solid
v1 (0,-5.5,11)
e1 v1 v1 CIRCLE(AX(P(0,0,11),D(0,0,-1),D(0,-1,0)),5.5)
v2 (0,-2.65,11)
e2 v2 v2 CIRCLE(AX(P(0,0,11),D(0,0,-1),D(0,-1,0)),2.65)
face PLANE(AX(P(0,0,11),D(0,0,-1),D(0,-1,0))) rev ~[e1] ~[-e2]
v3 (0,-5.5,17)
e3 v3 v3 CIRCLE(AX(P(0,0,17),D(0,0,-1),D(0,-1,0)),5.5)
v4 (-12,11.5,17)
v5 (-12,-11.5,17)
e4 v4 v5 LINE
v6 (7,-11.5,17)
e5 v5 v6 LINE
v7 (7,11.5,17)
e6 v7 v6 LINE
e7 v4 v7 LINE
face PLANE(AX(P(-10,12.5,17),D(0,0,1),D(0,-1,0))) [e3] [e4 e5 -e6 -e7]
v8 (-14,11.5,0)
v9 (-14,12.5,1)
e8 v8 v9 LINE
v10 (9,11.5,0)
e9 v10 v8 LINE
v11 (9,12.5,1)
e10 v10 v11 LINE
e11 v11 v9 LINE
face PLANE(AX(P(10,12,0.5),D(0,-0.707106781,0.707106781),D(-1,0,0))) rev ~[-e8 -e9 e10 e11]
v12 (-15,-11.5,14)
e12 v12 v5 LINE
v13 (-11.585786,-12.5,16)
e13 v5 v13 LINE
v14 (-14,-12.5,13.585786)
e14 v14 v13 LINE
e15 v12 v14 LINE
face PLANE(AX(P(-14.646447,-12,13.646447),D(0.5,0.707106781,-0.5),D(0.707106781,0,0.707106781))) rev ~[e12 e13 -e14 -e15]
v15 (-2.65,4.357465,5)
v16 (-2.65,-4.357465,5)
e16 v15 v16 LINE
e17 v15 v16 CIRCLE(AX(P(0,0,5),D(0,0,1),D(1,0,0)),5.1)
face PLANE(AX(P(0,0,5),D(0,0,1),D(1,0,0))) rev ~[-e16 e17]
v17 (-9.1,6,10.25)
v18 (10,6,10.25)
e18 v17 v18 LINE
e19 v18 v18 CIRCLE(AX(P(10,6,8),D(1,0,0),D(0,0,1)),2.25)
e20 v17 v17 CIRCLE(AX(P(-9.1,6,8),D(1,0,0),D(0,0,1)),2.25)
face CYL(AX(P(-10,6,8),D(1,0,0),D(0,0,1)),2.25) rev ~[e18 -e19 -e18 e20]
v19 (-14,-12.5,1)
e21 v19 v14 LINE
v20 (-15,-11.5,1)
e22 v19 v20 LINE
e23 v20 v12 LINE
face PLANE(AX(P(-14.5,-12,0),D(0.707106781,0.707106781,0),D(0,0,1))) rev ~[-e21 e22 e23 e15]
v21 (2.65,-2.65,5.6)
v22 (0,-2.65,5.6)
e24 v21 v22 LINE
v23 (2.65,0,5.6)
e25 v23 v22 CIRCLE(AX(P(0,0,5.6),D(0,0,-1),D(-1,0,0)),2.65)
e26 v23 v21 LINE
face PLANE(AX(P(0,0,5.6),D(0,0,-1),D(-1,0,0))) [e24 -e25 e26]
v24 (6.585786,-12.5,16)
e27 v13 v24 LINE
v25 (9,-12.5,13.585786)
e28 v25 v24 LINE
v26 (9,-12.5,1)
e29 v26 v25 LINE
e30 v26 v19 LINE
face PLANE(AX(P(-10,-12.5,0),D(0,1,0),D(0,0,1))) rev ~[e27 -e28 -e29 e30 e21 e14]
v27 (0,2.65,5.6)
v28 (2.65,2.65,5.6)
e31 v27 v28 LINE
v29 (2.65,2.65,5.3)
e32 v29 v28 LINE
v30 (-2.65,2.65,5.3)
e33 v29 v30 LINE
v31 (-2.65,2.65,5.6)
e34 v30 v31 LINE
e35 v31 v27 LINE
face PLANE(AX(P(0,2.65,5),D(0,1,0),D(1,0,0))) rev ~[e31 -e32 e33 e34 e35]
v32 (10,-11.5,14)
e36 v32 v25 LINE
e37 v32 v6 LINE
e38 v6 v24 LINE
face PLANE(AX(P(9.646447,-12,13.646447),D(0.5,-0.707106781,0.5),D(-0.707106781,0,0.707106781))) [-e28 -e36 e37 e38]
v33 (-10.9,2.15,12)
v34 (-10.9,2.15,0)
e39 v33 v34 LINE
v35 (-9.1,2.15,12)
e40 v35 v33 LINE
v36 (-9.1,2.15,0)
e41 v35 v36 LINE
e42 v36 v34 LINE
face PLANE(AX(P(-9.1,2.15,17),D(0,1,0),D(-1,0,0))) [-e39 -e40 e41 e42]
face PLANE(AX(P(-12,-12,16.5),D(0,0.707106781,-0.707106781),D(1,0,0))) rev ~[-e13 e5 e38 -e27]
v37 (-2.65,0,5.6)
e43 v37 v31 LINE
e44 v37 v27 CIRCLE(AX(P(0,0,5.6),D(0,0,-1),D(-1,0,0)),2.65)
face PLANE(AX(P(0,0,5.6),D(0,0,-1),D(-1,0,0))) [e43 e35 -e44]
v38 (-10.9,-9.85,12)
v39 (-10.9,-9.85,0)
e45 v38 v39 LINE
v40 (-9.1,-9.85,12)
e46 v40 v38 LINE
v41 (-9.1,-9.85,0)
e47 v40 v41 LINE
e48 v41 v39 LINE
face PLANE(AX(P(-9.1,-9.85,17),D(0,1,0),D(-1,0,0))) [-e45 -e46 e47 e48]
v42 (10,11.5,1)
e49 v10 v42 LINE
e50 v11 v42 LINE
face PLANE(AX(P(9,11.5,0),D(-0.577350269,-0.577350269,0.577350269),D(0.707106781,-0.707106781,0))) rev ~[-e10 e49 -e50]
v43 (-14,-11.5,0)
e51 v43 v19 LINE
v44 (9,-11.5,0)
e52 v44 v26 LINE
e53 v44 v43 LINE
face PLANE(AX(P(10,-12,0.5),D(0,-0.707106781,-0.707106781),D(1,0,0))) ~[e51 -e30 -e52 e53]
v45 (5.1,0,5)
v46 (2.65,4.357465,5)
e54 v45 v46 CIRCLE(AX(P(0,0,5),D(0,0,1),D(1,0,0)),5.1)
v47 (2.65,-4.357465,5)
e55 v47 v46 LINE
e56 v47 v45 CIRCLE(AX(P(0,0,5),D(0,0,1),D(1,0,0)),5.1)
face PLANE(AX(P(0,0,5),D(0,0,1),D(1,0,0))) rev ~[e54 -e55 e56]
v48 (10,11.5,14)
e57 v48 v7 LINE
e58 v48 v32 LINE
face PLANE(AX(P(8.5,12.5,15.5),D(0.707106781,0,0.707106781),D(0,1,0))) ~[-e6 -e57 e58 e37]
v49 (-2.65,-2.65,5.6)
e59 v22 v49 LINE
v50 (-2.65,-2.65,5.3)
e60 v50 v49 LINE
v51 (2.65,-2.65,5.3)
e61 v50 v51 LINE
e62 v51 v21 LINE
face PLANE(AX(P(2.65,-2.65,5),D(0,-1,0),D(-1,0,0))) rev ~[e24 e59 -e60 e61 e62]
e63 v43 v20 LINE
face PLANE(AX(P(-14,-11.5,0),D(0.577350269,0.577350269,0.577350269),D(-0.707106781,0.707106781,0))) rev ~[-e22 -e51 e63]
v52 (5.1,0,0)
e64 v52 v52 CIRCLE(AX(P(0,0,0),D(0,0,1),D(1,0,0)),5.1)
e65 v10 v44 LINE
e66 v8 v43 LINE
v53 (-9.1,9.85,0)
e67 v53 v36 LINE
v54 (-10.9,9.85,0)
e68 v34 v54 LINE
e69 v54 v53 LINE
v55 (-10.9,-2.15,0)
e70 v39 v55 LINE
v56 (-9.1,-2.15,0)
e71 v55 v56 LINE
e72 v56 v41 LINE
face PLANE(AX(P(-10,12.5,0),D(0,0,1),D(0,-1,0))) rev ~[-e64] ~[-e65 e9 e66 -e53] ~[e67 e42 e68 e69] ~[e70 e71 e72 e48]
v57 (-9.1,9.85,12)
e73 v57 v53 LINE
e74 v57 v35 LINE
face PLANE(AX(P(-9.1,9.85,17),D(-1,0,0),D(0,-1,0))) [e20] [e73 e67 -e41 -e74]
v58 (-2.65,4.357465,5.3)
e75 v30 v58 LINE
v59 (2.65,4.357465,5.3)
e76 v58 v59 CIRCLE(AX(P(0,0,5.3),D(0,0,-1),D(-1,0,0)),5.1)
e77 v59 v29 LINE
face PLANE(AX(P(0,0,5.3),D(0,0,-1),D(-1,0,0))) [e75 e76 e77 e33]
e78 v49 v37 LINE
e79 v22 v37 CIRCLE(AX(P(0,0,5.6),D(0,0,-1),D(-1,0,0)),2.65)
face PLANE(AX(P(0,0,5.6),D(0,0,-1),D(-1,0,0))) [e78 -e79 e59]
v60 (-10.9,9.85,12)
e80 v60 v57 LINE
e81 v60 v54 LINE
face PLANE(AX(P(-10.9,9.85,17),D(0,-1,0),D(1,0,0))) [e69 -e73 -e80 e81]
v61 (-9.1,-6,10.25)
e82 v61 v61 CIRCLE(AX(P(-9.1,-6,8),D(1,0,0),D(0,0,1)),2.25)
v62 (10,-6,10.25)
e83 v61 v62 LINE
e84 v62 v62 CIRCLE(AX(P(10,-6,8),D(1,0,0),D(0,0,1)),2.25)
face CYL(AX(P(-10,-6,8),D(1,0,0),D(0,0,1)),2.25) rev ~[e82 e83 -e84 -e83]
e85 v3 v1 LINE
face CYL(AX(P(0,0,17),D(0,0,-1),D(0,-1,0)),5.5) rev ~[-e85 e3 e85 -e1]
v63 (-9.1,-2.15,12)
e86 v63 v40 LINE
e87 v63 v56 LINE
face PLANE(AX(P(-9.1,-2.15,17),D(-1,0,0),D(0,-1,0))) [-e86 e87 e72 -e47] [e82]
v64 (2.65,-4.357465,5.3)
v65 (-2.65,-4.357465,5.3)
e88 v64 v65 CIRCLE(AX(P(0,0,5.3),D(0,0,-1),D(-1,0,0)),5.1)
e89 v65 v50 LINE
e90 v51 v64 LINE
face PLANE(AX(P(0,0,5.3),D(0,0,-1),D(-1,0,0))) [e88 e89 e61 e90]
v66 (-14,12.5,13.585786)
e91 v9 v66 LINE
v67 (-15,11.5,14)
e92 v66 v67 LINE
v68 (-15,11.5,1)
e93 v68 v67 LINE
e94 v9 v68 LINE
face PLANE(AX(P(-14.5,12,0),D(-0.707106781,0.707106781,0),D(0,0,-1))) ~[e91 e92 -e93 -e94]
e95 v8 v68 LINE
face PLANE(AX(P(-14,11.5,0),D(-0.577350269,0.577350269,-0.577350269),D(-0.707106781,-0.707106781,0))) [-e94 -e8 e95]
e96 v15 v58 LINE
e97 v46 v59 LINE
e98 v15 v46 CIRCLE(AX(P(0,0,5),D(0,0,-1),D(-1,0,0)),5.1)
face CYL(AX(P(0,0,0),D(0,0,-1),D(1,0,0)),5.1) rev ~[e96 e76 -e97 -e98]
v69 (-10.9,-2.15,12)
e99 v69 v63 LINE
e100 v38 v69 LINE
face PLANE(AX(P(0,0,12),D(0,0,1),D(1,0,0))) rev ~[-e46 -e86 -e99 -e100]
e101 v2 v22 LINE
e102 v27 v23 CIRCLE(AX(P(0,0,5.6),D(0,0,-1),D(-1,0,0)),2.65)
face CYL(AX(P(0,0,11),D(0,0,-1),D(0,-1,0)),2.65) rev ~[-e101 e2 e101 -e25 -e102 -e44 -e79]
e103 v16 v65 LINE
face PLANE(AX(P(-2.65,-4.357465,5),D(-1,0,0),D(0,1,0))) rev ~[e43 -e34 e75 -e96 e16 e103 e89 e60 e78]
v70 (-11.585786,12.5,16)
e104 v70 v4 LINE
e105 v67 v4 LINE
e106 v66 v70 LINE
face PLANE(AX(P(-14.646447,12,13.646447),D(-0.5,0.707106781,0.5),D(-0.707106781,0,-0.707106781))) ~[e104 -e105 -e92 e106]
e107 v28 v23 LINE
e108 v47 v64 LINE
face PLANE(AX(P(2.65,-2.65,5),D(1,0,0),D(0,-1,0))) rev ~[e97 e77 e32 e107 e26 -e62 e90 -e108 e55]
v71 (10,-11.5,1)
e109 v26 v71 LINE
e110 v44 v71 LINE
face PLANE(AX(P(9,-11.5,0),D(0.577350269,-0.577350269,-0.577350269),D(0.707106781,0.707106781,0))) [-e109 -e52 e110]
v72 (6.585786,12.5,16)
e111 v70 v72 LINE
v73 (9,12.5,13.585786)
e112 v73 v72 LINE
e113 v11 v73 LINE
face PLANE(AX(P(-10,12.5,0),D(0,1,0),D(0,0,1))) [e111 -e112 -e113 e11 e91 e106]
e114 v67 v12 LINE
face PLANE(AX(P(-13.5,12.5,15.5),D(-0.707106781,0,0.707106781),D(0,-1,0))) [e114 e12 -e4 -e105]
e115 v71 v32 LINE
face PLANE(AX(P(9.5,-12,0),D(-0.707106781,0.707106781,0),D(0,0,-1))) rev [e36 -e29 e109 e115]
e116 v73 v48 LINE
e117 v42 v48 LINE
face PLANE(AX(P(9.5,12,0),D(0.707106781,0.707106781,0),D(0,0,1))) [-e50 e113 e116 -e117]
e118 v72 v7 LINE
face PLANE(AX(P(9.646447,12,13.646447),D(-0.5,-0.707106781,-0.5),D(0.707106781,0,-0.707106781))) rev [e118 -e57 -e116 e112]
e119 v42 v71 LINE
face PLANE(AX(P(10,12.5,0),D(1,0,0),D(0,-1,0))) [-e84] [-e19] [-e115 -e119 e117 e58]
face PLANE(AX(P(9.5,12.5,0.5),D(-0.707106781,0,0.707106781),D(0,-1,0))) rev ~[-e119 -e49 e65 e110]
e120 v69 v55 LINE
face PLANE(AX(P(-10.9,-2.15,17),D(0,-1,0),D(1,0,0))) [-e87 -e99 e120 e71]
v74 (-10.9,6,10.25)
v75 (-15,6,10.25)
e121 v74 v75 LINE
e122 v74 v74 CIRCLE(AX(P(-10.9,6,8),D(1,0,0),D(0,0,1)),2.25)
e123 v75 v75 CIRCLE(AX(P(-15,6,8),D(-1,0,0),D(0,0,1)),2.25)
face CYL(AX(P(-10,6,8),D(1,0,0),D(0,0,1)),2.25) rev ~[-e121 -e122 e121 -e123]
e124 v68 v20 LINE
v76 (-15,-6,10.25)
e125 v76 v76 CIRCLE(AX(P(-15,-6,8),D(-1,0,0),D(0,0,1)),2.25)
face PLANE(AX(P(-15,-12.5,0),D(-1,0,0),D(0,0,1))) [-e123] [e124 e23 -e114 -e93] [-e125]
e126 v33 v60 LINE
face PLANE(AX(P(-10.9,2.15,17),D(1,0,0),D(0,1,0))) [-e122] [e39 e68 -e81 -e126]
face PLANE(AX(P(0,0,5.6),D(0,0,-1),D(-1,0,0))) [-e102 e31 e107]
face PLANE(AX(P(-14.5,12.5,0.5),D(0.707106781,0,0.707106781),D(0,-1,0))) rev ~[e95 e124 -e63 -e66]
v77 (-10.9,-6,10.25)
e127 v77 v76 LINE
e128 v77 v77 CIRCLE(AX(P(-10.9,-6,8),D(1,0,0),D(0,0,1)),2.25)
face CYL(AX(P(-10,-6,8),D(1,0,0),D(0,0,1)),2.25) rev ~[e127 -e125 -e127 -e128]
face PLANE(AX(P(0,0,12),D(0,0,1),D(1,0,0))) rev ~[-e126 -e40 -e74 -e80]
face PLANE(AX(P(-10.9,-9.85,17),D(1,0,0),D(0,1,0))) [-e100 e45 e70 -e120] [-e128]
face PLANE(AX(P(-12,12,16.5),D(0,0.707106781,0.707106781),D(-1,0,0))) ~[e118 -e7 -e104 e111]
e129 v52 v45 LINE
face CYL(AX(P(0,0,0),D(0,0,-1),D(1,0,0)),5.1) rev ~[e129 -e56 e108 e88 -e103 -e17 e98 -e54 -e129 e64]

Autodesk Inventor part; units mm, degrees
ref_plane "YZ Plane" through (0, 0, 0) normal (1, 0, 0) x (0, 1, 0)
ref_plane "XZ Plane" through (0, 0, 0) normal (0, 1, 0) x (-1, 0, 0)
ref_plane "XY Plane" through (0, 0, 0) normal (0, 0, 1) x (1, 0, 0)
sketch "スケッチ1" plane through (0, 0, 0) normal (0, 0, 1) x (1, 0, 0)
  circle A0 centre (0, 0) radius 5.1
  line L0 (10, -12.5) -> (-10, -12.5)
  line L1 (-10, -12.5) -> (-10, 12.5)
  line L2 (-10, 12.5) -> (10, 12.5)
  line L3 (10, 12.5) -> (10, -12.5)
  line L4 (10, -12.5) -> (-10, 12.5) construction
  line L5 (-10, -12.5) -> (10, 12.5) construction
  dimension "d0" = 10.2
  dimension "d1" = 25
  dimension "d2" = 20
extrude "押し出し1" add sketch "スケッチ1" along normal blind 17
sketch "スケッチ2" plane through (0, 0, 17) normal (0, 0, 1) x (1, 0, 0)
  circle A0 centre (0, 0) radius 5.1 projected
extrude "押し出し2" add sketch "スケッチ2" against normal blind 12
sketch "スケッチ3" plane through (0, 0, 17) normal (0, 0, 1) x (1, 0, 0)
  point P0 (0, 0)
hole "穴1" at (0, 0, 17) direction (0, 0, -1) diameter 5.3 depth 58 counterbore diameter 11 counterbore depth 6
sketch "Sketch7" plane through (-10, -12.5, 0) normal (-1, 0, 0) x (0, 0, 1)
  line L0 (0, 25) -> (0, 0) projected
  line L1 (5, 7.4) -> (5, 17.6) projected
  line L2 (0, 17.6) -> (0, 7.4) projected
  point P0 (0, 12.5)
  point P1 (8, 6.5)
  point P2 (8, 18.5)
  dimension "d35" = 8
  dimension "d36" = 12
  dimension "d37" = 6
hole "Hole3" at (-10, -6, 8) at (-10, 6, 8) direction (1, 0, 0) diameter 4.5 depth 58
chamfer "Chamfer2" distance 3 angle 45 1 edges at (10, 0, 17)
sketch "Sketch8" plane through (-10, -12.5, 0) normal (-1, 0, 0) x (0, 0, 1)
  circle A0 centre (8, 6.5) radius 2.25 projected
  circle A1 centre (8, 18.5) radius 2.25 projected
  line L0 (0, 25) -> (0, 0) projected
  line L1 (0, 0) -> (17, 0) projected
  line L2 (17, 25) -> (17, 0) projected
  line L3 (0, 25) -> (17, 25) projected
  point P0 (0, 12.5)
extrude "Extrusion5" add sketch "Sketch8" along normal blind 5
sketch "Sketch9" plane through (0, 0, 17) normal (0, 0, 1) x (1, 0, 0)
  line L0 (7, 12.5) -> (7, -12.5) projected
  line L1 (7, 12.5) -> (-15, 12.5) projected
  line L2 (-15, -12.5) -> (-15, 12.5) projected
  line L3 (7, -12.5) -> (-15, -12.5) projected
  circle A0 centre (0, 0) radius 5.5 projected
  line L4 (-15, 3.75) -> (-15, 8.25) projected
  line L5 (10, 8.25) -> (10, 3.75) projected
  line L6 (-15, -8.25) -> (-15, -3.75) projected
  line L7 (-15, -8.25) -> (-15, -3.75) projected
  line L8 (10, -3.75) -> (10, -8.25) projected
  line L9 (-10.9, 9.85) -> (-9.1, 9.85)
  line L10 (-9.1, 9.85) -> (-9.1, 2.15)
  line L11 (-9.1, 2.15) -> (-10.9, 2.15)
  line L12 (-10.9, 2.15) -> (-10.9, 9.85)
  line L13 (-10.9, 9.85) -> (-9.1, 2.15) construction
  line L14 (-9.1, 9.85) -> (-10.9, 2.15) construction
  line L15 (-10.9, -2.15) -> (-9.1, -2.15)
  line L16 (-9.1, -2.15) -> (-9.1, -9.85)
  line L17 (-9.1, -9.85) -> (-10.9, -9.85)
  line L18 (-10.9, -9.85) -> (-10.9, -2.15)
  line L19 (-10.9, -2.15) -> (-9.1, -9.85) construction
  line L20 (-9.1, -2.15) -> (-10.9, -9.85) construction
  line L21 (10, 8.25) -> (10, 3.75) projected
  point P0 (-10, 6)
  point P1 (-10, -6)
  point P2 (-10, 6)
  point P3 (-10, -6)
  point P4 (10, 6)
  point P5 (10, -6)
  point P6 (10, 6)
  dimension "d53" = 7.7
  dimension "d54" = 7.7
  dimension "d55" = 1.8
  dimension "d56" = 5
extrude "Extrusion6" cut sketch "Sketch9" against normal through all contours L9 L10 L11 L12 | L15 L16 L17 L18
sketch "Sketch10" plane through (0, 0, 17) normal (0, 0, 1) x (1, 0, 0)
  line L0 (-9.1, -2.15) -> (-9.1, -9.85) projected
  line L1 (-9.1, -9.85) -> (-10.9, -9.85) projected
  line L2 (-10.9, -9.85) -> (-10.9, -2.15) projected
  line L3 (-10.9, -2.15) -> (-9.1, -2.15) projected
  line L4 (-10.9, 9.85) -> (-9.1, 9.85) projected
  line L5 (-9.1, 9.85) -> (-9.1, 2.15) projected
  line L6 (-9.1, 2.15) -> (-10.9, 2.15) projected
  line L7 (-10.9, 2.15) -> (-10.9, 9.85) projected
  line L8 (7, 12.5) -> (7, -12.5) projected
  line L9 (7, 12.5) -> (-15, 12.5) projected
  line L10 (-15, -12.5) -> (-15, 12.5) projected
  line L11 (7, -12.5) -> (-15, -12.5) projected
  circle A0 centre (0, 0) radius 5.5 projected
extrude "Extrusion7" add sketch "Sketch10" against normal blind 5 contours L0 L1 L2 L3 | L4 L5 L6 L7
chamfer "Chamfer4" distance 3 angle 45 1 edges at (-15, 0, 17)
chamfer "面取り7" distance 1 angle 45 14 edges at (-15, 12.5, 7) (-13.5, 12.5, 15.5) (-2.5, 12.5, 17) (8.5, 12.5, 15.5) (10, 12.5, 7) (10, -12.5, 7) (8.5, -12.5, 15.5) (-2.5, -12.5, 17) (-13.5, -12.5, 15.5) (-15, -12.5, 7) (-2.5, 12.5, 0) (-2.5, -12.5, 0) (10, 0, 0) (-15, 0, 0)
sketch "スケッチ11" plane through (0, 0, 5) normal (0, 0, -1) x (-1, 0, 0)
  circle A0 centre (0, 0) radius 2.65 projected
  line L0 (2.65, 2.65) -> (-2.65, 2.65)
  line L1 (-2.65, 2.65) -> (-2.65, -2.65)
  line L2 (-2.65, -2.65) -> (2.65, -2.65)
  line L3 (2.65, -2.65) -> (2.65, 2.65)
  circle A1 centre (0, 0) radius 2.65 projected
  line L4 (2.65, 2.65) -> (-2.65, -2.65) construction
  line L5 (-2.65, 2.65) -> (2.65, -2.65) construction
  point P0 (2.65, 0)
  point P1 (0, -2.65)
  point P2 (0, 2.65)
  point P3 (-2.65, 0)
extrude "押し出し8" cut sketch "スケッチ11" against normal blind 0.6 contours L3 L2 A0 | A0 L0 L3 | A0 L1 L0 | L2 L1 A0
sketch "スケッチ12" plane through (0, 0, 5) normal (0, 0, -1) x (-1, 0, 0)
  line L0 (-2.65, 2.65) -> (2.65, 2.65) projected
  line L1 (2.65, -2.65) -> (-2.65, -2.65) projected
  circle A0 centre (0, 0) radius 5.1 projected
  line L2 (2.65, 5.3923) -> (-2.65, 5.3923)
  line L3 (-2.65, 5.3923) -> (-2.65, -5.3923)
  line L4 (-2.65, -5.3923) -> (2.65, -5.3923)
  line L5 (2.65, -5.3923) -> (2.65, 5.3923)
  line L6 (2.65, 5.3923) -> (-2.65, -5.3923) construction
  line L7 (-2.65, 5.3923) -> (2.65, -5.3923) construction
  point P0 (2.65, 2.65)
  point P1 (2.65, 4.3575)
  point P2 (-2.65, 4.3575)
  point P3 (2.65, -4.3575)
  point P4 (-2.65, -4.3575)
extrude "押し出し9" cut sketch "スケッチ12" against normal blind 0.3 contours L3 A0 L5 L0 | L1 L5 A0 L3
equation "\"d37\" = 0.5 * d36"
properties part number "Print_Parts_R" material "PC/ABS プラスチック"
